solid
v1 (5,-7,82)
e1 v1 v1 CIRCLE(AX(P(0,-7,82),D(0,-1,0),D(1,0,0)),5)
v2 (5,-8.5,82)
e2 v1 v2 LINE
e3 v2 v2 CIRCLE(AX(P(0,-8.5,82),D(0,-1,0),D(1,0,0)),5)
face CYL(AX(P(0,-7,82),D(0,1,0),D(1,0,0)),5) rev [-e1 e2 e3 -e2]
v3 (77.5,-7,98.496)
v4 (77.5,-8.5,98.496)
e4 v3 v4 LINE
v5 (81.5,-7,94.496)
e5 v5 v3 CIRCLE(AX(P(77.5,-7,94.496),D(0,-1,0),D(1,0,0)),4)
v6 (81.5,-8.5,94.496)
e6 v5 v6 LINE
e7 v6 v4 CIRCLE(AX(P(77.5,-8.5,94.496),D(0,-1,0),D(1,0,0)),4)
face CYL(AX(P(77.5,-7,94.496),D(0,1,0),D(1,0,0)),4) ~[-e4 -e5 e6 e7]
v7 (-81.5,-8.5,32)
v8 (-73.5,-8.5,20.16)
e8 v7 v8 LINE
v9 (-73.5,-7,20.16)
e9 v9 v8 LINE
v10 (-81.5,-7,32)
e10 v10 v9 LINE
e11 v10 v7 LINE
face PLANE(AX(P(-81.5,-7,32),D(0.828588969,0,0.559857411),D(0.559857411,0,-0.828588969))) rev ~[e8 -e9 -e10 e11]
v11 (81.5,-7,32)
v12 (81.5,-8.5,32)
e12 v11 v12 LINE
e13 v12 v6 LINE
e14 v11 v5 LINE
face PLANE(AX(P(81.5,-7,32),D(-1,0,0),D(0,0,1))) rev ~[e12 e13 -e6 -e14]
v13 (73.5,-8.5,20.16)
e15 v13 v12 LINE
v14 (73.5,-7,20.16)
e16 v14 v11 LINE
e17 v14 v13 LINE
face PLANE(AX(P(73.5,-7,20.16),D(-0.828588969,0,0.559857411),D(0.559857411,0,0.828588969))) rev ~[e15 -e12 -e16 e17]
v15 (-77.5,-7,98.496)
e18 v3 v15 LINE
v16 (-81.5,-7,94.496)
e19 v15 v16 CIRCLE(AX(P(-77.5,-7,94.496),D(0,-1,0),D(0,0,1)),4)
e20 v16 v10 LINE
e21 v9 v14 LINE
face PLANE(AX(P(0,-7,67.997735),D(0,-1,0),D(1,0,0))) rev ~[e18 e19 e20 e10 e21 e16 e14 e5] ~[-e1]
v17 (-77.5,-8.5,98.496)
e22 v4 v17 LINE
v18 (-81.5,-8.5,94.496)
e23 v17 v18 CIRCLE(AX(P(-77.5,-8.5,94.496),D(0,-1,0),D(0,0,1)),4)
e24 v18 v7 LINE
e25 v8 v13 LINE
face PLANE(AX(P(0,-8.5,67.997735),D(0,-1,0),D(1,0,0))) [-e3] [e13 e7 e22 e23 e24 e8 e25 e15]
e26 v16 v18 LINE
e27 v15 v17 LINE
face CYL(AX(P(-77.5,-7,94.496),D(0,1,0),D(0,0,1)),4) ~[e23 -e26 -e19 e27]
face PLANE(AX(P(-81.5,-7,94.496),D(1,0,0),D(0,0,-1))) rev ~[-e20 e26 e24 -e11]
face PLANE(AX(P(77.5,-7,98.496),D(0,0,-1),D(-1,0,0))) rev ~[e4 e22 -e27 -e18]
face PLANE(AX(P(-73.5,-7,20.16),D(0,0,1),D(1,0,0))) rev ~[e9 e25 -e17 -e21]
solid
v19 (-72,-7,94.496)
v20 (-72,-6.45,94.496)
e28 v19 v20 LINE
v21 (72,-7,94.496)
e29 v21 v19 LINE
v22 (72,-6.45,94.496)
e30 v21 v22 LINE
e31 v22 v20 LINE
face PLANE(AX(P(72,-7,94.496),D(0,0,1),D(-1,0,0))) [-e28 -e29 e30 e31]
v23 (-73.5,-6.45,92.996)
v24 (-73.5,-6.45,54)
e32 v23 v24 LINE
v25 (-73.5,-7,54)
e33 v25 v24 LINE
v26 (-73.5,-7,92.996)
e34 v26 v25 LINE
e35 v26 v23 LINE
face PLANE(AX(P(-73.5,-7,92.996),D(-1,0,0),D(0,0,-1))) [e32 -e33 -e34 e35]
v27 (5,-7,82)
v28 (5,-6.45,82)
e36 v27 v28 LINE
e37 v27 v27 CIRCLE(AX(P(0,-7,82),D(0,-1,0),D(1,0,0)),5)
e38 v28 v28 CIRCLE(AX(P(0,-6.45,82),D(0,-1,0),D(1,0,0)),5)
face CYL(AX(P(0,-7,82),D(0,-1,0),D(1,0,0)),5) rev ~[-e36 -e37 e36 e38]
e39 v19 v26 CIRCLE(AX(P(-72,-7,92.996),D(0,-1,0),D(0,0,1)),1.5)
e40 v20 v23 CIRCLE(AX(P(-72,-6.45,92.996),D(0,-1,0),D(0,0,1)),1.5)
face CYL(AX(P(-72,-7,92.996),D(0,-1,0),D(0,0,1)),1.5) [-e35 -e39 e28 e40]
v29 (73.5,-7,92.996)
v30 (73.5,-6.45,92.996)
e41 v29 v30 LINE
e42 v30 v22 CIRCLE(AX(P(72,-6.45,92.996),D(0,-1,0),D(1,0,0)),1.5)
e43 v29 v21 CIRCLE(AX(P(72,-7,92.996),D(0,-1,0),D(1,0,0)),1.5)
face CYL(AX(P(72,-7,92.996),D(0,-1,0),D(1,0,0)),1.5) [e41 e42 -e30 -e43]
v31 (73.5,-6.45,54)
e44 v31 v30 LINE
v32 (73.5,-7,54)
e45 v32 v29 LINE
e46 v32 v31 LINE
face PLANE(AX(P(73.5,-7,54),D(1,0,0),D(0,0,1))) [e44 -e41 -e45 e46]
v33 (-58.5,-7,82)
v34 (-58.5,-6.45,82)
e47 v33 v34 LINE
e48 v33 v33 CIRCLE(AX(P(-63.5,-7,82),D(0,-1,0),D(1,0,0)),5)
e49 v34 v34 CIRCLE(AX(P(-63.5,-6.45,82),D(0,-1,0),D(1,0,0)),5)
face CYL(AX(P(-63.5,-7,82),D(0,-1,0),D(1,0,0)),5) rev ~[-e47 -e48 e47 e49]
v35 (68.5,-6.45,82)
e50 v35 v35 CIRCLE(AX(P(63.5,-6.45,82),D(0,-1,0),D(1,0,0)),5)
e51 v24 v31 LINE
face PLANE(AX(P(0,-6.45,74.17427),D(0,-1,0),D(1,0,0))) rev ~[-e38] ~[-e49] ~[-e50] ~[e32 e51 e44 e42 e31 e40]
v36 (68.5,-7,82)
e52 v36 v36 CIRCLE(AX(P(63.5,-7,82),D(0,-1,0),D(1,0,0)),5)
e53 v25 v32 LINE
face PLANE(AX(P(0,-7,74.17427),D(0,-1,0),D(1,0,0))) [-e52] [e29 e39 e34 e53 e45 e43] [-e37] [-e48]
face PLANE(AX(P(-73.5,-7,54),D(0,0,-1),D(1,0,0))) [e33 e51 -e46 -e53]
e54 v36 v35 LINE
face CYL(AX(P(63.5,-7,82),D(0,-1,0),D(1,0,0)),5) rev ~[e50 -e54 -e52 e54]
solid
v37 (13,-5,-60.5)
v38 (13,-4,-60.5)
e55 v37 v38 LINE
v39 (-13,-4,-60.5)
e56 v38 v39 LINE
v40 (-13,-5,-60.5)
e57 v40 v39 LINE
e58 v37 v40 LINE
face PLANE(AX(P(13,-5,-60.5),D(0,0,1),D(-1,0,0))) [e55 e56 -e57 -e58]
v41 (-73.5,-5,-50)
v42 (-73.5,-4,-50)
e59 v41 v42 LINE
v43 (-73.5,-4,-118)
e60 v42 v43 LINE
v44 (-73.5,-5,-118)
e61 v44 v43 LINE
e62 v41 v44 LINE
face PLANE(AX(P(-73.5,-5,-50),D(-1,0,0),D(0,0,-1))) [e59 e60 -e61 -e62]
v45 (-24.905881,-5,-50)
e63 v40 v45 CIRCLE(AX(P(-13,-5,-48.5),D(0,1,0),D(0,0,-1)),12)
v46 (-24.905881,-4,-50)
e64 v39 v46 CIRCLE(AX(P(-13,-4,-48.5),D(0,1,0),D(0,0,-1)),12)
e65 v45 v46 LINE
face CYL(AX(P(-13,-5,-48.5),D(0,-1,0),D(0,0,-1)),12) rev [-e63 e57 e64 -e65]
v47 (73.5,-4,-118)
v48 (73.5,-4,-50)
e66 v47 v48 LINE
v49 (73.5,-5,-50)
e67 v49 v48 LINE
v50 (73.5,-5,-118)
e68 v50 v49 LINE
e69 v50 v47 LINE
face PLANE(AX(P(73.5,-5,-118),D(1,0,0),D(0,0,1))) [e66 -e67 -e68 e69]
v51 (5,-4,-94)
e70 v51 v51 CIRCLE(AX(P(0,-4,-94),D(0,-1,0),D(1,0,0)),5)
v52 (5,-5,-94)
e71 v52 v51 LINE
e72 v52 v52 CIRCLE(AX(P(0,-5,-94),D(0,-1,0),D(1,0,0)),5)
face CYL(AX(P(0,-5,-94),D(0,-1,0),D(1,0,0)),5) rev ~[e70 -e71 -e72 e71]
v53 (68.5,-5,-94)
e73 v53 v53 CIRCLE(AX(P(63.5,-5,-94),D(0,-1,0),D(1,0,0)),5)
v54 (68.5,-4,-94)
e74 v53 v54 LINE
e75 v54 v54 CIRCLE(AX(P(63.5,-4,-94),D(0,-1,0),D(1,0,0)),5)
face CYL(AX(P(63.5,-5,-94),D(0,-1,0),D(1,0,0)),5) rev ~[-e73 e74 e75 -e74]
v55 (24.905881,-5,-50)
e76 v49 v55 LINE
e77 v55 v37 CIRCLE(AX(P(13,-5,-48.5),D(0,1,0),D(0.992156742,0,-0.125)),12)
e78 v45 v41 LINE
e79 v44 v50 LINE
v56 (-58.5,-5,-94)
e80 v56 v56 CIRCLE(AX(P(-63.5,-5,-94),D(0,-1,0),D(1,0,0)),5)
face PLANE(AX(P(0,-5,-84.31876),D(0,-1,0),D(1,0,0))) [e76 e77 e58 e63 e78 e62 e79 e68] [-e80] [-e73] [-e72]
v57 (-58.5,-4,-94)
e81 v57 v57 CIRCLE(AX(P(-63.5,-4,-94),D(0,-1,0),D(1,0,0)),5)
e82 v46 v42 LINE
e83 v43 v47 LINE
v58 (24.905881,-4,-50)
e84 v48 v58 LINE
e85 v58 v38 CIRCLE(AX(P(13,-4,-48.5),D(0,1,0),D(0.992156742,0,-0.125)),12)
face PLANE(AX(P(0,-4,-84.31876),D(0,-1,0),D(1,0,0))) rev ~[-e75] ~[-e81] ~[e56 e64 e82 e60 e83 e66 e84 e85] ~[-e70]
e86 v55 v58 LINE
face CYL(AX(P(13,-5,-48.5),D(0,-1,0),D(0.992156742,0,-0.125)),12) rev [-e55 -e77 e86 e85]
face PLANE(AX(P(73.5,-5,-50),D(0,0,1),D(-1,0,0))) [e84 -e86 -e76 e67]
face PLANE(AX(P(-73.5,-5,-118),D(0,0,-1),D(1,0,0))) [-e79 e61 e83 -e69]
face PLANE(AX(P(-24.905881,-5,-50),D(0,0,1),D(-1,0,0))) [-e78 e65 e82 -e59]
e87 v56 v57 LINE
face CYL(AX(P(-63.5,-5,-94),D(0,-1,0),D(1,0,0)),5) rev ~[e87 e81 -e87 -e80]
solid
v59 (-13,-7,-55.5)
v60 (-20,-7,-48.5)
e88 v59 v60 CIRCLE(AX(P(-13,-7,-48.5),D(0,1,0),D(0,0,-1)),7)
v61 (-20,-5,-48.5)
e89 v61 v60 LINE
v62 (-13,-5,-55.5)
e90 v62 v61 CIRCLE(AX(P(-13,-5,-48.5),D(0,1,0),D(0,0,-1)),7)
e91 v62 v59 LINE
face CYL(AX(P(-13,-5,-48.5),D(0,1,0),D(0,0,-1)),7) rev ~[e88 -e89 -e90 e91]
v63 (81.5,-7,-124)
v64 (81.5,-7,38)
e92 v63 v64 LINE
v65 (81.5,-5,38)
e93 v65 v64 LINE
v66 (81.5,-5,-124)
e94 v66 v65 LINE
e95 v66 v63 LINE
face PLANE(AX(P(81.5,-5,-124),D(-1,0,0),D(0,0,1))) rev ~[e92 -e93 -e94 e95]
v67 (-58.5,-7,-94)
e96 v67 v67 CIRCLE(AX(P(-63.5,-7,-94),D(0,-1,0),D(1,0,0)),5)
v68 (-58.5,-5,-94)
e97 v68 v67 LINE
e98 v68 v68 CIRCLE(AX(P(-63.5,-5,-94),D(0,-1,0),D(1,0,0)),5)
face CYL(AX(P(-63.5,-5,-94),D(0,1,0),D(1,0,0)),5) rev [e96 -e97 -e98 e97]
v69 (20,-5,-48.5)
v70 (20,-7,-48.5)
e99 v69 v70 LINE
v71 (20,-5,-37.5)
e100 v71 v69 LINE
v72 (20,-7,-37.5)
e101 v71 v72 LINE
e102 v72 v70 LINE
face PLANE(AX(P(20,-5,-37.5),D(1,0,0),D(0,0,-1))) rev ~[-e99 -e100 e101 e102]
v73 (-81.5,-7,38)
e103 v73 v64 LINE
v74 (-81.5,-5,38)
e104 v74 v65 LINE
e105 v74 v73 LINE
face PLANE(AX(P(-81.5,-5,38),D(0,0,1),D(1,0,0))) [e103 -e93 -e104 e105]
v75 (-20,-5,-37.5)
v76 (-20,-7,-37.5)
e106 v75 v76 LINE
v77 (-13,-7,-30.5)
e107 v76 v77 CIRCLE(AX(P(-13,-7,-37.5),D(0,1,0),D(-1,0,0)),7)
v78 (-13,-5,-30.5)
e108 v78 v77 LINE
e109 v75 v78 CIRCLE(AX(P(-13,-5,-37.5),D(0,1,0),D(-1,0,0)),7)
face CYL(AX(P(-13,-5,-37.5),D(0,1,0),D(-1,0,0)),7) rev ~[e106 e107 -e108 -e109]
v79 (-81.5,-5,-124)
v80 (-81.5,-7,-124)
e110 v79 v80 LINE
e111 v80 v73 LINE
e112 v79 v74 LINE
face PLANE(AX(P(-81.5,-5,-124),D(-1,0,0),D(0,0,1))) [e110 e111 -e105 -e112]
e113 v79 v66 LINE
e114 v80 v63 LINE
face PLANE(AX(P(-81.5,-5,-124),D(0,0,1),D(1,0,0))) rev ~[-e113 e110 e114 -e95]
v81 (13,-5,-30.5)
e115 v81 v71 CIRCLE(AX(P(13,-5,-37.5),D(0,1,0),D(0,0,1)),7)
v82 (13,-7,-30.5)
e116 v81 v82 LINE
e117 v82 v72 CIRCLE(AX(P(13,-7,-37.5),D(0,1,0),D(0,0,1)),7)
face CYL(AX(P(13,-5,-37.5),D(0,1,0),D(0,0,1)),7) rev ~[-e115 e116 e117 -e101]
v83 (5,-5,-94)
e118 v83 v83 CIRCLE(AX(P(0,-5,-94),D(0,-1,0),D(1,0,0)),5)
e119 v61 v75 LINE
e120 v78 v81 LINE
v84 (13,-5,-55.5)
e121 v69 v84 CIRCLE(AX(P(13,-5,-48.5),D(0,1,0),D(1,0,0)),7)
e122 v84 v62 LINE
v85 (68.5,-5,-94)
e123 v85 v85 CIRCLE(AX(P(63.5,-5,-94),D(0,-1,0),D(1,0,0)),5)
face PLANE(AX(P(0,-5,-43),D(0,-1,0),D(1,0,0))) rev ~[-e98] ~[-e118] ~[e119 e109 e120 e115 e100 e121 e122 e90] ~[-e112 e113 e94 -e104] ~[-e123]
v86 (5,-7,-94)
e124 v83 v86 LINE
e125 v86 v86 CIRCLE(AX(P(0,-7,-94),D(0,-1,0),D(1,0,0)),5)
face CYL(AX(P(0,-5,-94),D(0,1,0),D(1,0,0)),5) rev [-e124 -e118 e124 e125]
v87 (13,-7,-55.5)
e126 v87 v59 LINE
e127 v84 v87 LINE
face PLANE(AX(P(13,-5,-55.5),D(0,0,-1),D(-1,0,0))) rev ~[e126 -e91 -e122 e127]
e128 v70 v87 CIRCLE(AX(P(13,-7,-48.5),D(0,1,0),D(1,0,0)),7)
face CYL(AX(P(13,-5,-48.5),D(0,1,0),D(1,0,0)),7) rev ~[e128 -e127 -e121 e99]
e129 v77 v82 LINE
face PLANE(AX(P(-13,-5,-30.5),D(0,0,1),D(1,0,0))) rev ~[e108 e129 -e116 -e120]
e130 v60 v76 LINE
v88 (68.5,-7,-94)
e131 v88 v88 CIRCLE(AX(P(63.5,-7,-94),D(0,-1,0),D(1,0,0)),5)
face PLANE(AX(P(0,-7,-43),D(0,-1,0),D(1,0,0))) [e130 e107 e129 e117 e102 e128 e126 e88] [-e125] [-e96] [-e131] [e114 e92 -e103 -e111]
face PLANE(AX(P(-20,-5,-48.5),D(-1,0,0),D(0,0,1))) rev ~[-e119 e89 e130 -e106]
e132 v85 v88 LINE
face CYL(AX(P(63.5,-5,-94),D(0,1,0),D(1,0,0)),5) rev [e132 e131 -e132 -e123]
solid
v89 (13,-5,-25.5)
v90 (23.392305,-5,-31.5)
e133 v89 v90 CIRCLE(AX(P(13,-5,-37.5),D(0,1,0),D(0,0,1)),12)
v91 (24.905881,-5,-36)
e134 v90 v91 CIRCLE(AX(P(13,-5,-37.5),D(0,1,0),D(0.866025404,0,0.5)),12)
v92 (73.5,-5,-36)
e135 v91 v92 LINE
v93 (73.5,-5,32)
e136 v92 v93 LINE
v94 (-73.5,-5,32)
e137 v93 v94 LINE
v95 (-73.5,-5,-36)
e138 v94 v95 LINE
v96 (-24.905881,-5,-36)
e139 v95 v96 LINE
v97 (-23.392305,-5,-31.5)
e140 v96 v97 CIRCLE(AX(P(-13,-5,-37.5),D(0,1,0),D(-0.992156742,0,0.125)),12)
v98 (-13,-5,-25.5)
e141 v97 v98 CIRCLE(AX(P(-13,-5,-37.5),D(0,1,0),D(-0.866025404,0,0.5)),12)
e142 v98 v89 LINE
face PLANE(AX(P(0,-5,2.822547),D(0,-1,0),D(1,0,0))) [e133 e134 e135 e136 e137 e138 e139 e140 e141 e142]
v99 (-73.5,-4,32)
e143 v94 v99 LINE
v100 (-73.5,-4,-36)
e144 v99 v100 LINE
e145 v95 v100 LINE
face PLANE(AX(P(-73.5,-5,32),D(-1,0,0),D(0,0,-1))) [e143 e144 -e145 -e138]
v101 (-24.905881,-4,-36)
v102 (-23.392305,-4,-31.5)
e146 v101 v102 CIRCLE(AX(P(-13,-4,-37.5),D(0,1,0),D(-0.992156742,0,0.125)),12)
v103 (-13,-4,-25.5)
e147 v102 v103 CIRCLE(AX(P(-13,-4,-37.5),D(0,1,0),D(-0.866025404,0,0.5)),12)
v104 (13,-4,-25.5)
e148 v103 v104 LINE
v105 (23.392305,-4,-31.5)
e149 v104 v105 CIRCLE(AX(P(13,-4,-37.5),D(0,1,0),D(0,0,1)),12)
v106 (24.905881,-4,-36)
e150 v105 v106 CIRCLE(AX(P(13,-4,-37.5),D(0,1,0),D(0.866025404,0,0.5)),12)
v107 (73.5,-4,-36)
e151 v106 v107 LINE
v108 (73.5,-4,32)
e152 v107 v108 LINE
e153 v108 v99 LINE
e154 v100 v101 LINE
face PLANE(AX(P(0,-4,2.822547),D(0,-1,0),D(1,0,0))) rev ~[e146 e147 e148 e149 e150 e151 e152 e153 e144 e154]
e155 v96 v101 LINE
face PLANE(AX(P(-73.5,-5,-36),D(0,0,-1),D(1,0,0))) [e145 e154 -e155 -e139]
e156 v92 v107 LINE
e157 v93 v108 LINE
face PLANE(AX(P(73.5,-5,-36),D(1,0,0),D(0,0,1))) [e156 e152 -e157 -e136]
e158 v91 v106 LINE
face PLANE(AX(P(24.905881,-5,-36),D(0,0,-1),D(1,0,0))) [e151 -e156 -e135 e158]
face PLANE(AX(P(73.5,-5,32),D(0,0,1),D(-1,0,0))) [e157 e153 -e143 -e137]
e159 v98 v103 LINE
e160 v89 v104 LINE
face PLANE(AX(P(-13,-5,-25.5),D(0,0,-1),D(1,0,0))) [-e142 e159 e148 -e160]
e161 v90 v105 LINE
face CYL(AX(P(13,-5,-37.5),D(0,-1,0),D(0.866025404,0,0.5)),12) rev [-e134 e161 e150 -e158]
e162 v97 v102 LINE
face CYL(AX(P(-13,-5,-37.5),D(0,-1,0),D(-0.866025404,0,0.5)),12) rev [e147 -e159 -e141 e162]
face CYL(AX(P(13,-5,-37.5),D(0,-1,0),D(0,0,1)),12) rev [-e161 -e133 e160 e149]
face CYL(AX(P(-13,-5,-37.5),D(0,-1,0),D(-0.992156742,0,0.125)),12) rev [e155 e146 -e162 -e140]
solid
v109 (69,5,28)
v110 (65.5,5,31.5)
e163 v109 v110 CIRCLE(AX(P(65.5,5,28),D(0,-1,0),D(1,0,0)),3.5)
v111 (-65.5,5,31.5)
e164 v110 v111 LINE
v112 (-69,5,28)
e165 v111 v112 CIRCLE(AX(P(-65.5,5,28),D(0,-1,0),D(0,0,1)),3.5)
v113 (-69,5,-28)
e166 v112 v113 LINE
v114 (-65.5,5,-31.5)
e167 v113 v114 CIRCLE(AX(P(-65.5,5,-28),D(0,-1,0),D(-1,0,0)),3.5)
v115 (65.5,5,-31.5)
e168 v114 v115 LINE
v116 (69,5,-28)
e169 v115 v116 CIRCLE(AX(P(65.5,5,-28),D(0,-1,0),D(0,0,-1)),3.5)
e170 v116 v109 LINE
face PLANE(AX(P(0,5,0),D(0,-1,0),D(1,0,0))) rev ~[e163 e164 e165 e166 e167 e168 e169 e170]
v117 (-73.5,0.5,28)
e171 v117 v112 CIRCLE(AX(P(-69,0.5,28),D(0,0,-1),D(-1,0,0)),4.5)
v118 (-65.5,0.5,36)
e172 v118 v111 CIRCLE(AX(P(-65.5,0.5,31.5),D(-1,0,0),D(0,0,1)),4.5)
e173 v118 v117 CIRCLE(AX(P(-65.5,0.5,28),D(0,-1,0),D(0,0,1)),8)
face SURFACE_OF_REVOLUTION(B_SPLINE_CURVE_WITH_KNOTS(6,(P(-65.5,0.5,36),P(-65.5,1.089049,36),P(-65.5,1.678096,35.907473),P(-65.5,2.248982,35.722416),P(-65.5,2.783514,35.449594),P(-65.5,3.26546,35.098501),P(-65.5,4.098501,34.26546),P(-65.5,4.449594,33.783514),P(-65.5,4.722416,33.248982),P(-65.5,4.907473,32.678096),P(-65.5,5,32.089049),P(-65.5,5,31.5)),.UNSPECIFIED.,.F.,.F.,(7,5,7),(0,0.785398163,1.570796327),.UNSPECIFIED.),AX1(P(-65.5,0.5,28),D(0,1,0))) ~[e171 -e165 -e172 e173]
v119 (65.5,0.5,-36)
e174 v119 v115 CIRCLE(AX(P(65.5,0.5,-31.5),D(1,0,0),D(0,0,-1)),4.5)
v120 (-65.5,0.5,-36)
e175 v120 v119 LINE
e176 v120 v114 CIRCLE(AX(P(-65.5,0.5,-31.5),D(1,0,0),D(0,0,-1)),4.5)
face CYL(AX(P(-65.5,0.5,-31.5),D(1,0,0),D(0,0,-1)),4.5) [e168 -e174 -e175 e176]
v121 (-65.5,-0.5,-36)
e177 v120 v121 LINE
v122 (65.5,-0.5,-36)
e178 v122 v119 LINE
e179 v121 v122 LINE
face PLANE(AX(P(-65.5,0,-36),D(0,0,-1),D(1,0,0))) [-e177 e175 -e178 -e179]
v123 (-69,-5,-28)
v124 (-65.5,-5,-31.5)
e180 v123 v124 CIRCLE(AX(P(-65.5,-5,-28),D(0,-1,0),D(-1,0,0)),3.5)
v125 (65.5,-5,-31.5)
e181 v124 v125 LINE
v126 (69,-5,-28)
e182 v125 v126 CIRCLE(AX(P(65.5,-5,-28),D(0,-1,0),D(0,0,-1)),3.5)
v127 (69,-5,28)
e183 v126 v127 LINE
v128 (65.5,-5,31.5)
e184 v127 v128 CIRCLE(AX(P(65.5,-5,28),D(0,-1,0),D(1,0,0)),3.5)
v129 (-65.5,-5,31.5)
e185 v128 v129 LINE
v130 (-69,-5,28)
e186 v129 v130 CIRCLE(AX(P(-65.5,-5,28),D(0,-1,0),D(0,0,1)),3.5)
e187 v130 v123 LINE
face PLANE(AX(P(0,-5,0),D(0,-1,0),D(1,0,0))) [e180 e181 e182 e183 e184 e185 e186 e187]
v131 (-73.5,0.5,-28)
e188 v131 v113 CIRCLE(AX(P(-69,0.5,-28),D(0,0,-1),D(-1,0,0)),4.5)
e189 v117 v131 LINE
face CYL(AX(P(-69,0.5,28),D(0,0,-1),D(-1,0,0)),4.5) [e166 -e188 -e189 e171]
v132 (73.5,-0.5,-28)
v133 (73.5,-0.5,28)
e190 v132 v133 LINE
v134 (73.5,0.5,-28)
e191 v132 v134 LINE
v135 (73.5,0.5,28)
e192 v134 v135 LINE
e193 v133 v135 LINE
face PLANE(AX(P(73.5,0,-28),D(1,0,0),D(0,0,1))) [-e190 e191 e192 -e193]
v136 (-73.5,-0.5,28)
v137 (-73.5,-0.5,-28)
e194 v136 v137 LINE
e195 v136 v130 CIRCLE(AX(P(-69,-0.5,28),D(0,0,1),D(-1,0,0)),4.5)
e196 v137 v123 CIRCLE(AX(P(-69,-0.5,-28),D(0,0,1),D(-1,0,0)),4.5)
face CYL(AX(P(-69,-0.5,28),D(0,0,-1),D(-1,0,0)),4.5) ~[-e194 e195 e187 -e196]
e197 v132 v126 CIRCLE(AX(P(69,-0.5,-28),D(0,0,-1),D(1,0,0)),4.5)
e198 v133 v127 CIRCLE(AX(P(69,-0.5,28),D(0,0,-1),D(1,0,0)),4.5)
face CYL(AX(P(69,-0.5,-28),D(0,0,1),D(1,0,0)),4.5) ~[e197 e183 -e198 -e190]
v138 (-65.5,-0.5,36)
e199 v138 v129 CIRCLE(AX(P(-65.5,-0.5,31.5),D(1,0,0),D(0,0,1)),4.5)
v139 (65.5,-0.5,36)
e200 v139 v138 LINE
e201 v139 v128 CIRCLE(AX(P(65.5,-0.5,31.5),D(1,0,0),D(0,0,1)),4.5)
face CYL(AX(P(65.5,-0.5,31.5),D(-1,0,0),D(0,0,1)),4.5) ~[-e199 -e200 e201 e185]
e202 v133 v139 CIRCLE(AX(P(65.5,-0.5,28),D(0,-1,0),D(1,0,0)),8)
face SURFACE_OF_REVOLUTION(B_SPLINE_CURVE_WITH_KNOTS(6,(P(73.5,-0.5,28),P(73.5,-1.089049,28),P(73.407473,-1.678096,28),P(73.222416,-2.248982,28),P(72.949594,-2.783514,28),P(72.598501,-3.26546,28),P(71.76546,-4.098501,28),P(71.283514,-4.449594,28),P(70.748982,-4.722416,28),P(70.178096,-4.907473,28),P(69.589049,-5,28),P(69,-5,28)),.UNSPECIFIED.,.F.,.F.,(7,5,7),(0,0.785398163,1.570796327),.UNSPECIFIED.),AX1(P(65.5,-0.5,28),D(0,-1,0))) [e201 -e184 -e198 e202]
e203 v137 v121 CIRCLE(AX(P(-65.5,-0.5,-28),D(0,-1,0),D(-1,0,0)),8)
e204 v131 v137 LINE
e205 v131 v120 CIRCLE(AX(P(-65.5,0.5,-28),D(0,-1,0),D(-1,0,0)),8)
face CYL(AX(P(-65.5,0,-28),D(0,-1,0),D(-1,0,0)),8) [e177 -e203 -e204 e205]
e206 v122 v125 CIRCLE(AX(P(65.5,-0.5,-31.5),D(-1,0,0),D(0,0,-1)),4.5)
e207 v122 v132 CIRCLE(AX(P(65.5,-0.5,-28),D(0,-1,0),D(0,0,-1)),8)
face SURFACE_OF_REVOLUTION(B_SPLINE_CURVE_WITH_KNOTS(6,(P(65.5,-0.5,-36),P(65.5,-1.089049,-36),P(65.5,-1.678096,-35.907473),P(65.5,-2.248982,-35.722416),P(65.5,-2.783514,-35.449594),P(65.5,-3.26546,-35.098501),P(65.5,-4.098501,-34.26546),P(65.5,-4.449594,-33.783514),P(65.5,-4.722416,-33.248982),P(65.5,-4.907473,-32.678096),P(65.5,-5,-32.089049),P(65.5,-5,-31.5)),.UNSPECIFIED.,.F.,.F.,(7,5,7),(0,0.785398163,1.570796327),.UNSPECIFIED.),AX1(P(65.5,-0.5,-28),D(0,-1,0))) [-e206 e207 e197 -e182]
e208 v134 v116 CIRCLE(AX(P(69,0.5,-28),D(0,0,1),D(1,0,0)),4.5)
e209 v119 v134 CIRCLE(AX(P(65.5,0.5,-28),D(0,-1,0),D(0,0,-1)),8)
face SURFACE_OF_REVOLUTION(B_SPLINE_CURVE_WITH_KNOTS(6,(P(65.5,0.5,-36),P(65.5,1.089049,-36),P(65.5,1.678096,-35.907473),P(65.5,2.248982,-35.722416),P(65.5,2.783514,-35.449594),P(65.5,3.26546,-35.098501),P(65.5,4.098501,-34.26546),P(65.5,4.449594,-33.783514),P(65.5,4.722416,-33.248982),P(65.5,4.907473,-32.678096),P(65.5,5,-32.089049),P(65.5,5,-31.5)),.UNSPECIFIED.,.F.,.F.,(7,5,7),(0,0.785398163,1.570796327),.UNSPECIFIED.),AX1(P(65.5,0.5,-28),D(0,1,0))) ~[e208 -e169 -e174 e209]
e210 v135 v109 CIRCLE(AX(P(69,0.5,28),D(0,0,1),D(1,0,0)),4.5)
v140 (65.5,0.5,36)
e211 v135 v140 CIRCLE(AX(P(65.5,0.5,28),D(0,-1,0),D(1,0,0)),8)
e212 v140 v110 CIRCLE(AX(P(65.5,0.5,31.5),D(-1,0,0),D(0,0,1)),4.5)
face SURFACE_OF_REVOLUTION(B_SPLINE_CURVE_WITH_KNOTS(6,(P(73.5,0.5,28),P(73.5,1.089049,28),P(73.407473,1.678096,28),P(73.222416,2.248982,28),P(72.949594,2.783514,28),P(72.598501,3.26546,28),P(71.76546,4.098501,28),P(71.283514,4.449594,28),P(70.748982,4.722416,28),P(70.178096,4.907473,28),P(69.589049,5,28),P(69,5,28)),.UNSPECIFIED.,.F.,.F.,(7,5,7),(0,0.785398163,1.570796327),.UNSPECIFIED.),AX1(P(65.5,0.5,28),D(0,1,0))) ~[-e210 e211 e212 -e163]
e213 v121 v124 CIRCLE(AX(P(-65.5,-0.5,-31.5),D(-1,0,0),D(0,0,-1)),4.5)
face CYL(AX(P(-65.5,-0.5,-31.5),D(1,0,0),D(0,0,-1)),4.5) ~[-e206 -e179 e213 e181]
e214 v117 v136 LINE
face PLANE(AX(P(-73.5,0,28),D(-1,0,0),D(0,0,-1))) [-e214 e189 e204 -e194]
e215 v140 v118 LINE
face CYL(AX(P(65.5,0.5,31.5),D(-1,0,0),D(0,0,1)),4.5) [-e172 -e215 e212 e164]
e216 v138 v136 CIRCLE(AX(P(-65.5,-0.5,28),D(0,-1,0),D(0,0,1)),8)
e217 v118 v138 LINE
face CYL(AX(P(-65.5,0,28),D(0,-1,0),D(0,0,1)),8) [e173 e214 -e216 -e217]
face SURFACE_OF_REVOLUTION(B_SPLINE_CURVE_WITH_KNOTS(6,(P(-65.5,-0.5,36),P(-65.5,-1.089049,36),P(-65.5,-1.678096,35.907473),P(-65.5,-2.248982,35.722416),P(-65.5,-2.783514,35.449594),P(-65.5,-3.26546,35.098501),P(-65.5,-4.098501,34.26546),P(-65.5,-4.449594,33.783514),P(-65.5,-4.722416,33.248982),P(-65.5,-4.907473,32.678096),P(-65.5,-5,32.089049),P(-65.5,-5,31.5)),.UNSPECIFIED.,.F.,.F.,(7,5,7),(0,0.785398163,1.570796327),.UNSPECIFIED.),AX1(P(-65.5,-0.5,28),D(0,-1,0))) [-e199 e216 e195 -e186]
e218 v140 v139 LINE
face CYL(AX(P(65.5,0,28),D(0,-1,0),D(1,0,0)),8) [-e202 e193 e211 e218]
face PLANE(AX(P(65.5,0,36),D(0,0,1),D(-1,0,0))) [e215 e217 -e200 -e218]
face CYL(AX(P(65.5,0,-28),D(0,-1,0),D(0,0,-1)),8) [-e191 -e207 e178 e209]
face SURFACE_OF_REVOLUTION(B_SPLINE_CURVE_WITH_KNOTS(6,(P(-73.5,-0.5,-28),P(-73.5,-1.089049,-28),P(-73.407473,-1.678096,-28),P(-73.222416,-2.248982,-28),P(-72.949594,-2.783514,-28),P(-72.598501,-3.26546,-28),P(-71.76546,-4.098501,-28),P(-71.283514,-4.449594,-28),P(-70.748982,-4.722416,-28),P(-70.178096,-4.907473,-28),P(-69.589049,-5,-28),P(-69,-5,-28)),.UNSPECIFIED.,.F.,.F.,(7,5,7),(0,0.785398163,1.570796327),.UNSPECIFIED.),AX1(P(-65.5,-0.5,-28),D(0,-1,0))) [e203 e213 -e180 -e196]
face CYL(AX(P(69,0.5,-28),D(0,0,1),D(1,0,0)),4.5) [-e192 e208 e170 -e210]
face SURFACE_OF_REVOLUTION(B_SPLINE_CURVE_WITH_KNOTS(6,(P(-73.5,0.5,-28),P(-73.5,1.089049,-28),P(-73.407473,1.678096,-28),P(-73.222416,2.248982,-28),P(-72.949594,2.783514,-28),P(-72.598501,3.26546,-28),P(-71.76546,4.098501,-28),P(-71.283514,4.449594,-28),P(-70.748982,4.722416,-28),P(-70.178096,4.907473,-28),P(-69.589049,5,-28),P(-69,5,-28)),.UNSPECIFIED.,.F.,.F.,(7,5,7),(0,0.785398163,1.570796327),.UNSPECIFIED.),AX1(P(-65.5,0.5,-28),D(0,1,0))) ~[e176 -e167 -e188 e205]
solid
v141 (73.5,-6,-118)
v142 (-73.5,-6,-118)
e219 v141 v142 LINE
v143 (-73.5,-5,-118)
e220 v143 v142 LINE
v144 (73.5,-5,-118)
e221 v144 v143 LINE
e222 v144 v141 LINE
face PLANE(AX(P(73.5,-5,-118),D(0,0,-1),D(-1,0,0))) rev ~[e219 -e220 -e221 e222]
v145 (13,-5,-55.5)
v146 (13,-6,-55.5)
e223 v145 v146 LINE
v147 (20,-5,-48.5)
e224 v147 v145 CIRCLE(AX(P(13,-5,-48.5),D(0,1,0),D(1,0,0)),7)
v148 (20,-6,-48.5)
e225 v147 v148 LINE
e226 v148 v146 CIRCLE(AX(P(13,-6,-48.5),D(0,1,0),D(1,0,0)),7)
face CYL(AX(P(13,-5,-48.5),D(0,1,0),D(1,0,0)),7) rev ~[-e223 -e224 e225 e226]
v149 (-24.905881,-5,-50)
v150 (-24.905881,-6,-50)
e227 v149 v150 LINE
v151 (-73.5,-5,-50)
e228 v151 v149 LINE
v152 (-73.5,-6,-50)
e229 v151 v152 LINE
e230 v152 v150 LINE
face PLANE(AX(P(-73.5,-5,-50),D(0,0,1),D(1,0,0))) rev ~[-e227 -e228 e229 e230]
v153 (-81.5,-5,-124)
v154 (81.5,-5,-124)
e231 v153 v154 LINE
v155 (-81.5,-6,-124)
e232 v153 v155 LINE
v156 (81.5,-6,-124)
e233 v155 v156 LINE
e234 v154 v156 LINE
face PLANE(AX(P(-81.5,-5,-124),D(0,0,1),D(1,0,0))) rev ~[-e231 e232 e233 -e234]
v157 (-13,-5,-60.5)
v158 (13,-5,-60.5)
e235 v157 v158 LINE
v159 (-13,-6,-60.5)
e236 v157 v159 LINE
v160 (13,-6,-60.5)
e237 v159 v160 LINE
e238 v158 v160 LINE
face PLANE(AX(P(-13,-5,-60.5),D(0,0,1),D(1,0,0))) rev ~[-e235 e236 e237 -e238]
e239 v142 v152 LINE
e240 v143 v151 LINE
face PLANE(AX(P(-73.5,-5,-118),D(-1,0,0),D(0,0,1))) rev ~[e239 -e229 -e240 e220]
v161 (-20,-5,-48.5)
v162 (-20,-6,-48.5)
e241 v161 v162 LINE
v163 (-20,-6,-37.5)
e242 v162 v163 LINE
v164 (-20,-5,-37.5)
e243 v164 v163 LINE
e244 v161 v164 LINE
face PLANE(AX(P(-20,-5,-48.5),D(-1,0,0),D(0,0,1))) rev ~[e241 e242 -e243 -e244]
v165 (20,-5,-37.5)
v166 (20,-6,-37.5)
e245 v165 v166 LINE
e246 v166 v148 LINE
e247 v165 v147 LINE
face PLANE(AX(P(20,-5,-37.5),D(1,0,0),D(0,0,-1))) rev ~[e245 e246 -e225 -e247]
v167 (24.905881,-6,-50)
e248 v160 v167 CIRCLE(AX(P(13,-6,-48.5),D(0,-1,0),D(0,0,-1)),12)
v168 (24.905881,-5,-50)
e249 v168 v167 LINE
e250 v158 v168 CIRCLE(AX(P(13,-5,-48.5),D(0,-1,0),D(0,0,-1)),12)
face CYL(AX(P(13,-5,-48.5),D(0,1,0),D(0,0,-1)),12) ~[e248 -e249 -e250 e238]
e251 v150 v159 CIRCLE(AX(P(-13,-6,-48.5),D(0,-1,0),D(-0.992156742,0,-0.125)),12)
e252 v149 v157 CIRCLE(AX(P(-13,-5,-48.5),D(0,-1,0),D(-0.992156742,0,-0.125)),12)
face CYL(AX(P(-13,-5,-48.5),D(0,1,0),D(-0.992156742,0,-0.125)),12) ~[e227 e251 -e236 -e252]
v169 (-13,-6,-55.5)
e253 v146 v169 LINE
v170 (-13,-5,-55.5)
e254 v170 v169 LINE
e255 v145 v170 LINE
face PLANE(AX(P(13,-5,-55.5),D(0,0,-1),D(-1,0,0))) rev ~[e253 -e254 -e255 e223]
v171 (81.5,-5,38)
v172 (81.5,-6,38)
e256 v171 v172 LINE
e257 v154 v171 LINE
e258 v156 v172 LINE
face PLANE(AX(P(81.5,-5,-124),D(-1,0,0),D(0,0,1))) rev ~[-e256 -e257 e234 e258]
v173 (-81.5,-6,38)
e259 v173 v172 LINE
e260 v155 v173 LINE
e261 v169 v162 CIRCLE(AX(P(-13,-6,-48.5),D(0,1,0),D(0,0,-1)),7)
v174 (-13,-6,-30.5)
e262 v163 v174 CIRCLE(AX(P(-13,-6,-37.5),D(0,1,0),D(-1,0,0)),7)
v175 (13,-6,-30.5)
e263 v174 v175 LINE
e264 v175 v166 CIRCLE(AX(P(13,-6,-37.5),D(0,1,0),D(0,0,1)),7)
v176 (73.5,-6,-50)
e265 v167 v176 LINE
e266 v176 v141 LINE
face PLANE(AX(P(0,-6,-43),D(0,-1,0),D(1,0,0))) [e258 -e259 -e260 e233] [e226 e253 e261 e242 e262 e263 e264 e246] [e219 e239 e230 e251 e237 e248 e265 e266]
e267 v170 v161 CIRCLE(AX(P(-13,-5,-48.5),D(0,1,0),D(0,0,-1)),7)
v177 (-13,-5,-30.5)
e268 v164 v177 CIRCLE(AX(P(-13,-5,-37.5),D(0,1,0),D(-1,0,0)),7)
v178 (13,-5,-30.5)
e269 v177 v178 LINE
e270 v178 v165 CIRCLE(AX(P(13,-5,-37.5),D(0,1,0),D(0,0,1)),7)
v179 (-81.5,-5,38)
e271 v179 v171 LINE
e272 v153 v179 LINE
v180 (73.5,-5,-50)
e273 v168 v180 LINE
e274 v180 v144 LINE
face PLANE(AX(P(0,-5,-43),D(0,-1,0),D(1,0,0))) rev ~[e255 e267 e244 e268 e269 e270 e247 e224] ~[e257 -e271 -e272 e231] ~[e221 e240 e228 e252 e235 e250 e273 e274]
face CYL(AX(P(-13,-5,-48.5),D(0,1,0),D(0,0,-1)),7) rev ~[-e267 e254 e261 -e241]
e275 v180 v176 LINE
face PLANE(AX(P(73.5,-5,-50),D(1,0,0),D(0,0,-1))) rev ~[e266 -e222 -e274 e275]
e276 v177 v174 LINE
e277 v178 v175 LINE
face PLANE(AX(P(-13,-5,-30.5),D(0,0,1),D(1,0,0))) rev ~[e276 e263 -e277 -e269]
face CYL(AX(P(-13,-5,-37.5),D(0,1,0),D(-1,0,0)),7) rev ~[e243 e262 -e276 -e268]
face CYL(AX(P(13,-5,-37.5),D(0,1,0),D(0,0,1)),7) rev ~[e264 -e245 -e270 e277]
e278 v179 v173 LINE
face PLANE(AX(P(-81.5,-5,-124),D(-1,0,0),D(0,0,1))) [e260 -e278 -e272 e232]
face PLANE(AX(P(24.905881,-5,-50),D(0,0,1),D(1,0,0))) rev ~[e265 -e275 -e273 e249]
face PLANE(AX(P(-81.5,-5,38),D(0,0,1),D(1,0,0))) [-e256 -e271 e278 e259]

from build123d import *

# Parameters (mm, degrees)
F1_DEPTH = 5
F2_R     = 4.5
F3_W     = 163
F3_H     = 162
F3_R     = 5
F4_DEPTH = 2
F5_DEPTH = 1
F6_R     = 5
F7_DEPTH = 1.5
F8_DEPTH = 0.55
F9_DEPTH = 1


# Not quite as in the source:
# - a feature names something its author has since deleted; it is built from what else it names


with BuildPart() as f1:
    # F0 (on Front) → F1 (new body, symmetric)
    with BuildSketch(Plane.XZ):
        with BuildLine():
            ThreePointArc((73.5, 28), (71.1568542495, 33.6568542495), (65.5, 36))
            Line((65.5, 36), (-65.5, 36))
            ThreePointArc((-65.5, 36), (-71.1568542495, 33.6568542495), (-73.5, 28))
            Line((-73.5, 28), (-73.5, -28))
            ThreePointArc((-73.5, -28), (-71.1568542495, -33.6568542495), (-65.5, -36))
            Line((-65.5, -36), (65.5, -36))
            ThreePointArc((65.5, -36), (71.1568542495, -33.6568542495), (73.5, -28))
            Line((73.5, -28), (73.5, 28))
        make_face()
    extrude(amount=F1_DEPTH, both=True)

    # F2
    f2_edges = [f1.edges().sort_by_distance(p)[0] for p in [
        (71.156854, -5, 33.656854),
        (0, -5, 36),
        (-71.156854, -5, 33.656854),
        (-73.5, -5, 0),
        (-71.156854, -5, -33.656854),
        (0, -5, -36),
        (71.156854, -5, -33.656854),
        (73.5, -5, 0),
        (71.156854, 5, 33.656854),
        (0, 5, 36),
        (-71.156854, 5, 33.656854),
        (-73.5, 5, 0),
        (-71.156854, 5, -33.656854),
        (0, 5, -36),
        (71.156854, 5, -33.656854),
        (73.5, 5, 0),
    ]]
    fillet(f2_edges, radius=F2_R)


with BuildPart() as f4:
    # F3 (on face) → F4 (new body)
    with BuildSketch(Plane.XZ.offset(5)):
        with Locations((0, -43)):
            Rectangle(F3_W, F3_H)
        with BuildLine():
            Line((-73.5, -50), (-24.9058808998, -50))
            ThreePointArc((-24.9058808998, -50), (-20.9372539332, -57.5), (-13, -60.5))
            Line((-13, -60.5), (13, -60.5))
            ThreePointArc((13, -60.5), (20.9372539332, -57.5), (24.9058808998, -50))
            Line((24.9058808998, -50), (73.5, -50))
            Line((73.5, -50), (73.5, -118))
            Line((73.5, -118), (-73.5, -118))
            Line((-73.5, -118), (-73.5, -50))
        make_face(mode=Mode.SUBTRACT)
        with BuildLine():
            ThreePointArc((-20, -37.5), (-17.9497474683, -32.5502525317), (-13, -30.5))
            Line((-13, -30.5), (13, -30.5))
            ThreePointArc((13, -30.5), (17.9497474683, -32.5502525317), (20, -37.5))
            Line((20, -37.5), (20, -48.5))
            ThreePointArc((20, -48.5), (17.9497474683, -53.4497474683), (13, -55.5))
            Line((13, -55.5), (-13, -55.5))
            ThreePointArc((-13, -55.5), (-17.9497474683, -53.4497474683), (-20, -48.5))
            Line((-20, -48.5), (-20, -37.5))
        make_face(mode=Mode.SUBTRACT)
        with BuildLine():
            Line((73.5, 32), (73.5, -36))
            Line((73.5, -36), (24.9058808998, -36))
            ThreePointArc((24.9058808998, -36), (20.9372539332, -28.5), (13, -25.5))
            Line((13, -25.5), (-13, -25.5))
            ThreePointArc((-13, -25.5), (-20.9372539332, -28.5), (-24.9058808998, -36))
            Line((-24.9058808998, -36), (-73.5, -36))
            Line((-73.5, -36), (-73.5, 32))
            Line((-73.5, 32), (73.5, 32))
        make_face(mode=Mode.SUBTRACT)
        with BuildLine():
            ThreePointArc((13, -25.5), (19, -27.1076951546), (23.3923048454, -31.5))
            Line((23.3923048454, -31.5), (65.5, -31.5))
            ThreePointArc((65.5, -31.5), (67.9748737342, -30.4748737342), (69, -28))
            Line((69, -28), (69, 28))
            ThreePointArc((69, 28), (67.9748737342, 30.4748737342), (65.5, 31.5))
            Line((65.5, 31.5), (-65.5, 31.5))
            ThreePointArc((-65.5, 31.5), (-67.9748737342, 30.4748737342), (-69, 28))
            Line((-69, 28), (-69, -28))
            ThreePointArc((-69, -28), (-67.9748737342, -30.4748737342), (-65.5, -31.5))
            Line((-65.5, -31.5), (-23.3923048454, -31.5))
            ThreePointArc((-23.3923048454, -31.5), (-19, -27.1076951546), (-13, -25.5))
            Line((-13, -25.5), (13, -25.5))
        make_face()
        with BuildLine():
            ThreePointArc((-13, -60.5), (-20.9372539332, -57.5), (-24.9058808998, -50))
            Line((-24.9058808998, -50), (-73.5, -50))
            Line((-73.5, -50), (-73.5, -118))
            Line((-73.5, -118), (73.5, -118))
            Line((73.5, -118), (73.5, -50))
            Line((73.5, -50), (24.9058808998, -50))
            ThreePointArc((24.9058808998, -50), (20.9372539332, -57.5), (13, -60.5))
            Line((13, -60.5), (-13, -60.5))
        make_face()
        with Locations((-63.5, -94)):
            Circle(F3_R, mode=Mode.SUBTRACT)
        with Locations((0, -94)):
            Circle(F3_R, mode=Mode.SUBTRACT)
        with Locations((63.5, -94)):
            Circle(F3_R, mode=Mode.SUBTRACT)
        with BuildLine():
            Line((24.9058808998, -36), (73.5, -36))
            Line((73.5, -36), (73.5, 32))
            Line((73.5, 32), (-73.5, 32))
            Line((-73.5, 32), (-73.5, -36))
            Line((-73.5, -36), (-24.9058808998, -36))
            ThreePointArc((-24.9058808998, -36), (-24.3738635424, -33.6743983325), (-23.3923048454, -31.5))
            Line((-23.3923048454, -31.5), (-65.5, -31.5))
            ThreePointArc((-65.5, -31.5), (-67.9748737342, -30.4748737342), (-69, -28))
            Line((-69, -28), (-69, 28))
            ThreePointArc((-69, 28), (-67.9748737342, 30.4748737342), (-65.5, 31.5))
            Line((-65.5, 31.5), (65.5, 31.5))
            ThreePointArc((65.5, 31.5), (67.9748737342, 30.4748737342), (69, 28))
            Line((69, 28), (69, -28))
            ThreePointArc((69, -28), (67.9748737342, -30.4748737342), (65.5, -31.5))
            Line((65.5, -31.5), (23.3923048454, -31.5))
            ThreePointArc((23.3923048454, -31.5), (24.3738635424, -33.6743983325), (24.9058808998, -36))
        make_face()
    extrude(amount=F4_DEPTH)


with BuildPart() as f5:
    # F3 (on face) → F5 (new body)
    with BuildSketch(Plane.XZ.offset(5)):
        with BuildLine():
            Line((24.9058808998, -36), (73.5, -36))
            Line((73.5, -36), (73.5, 32))
            Line((73.5, 32), (-73.5, 32))
            Line((-73.5, 32), (-73.5, -36))
            Line((-73.5, -36), (-24.9058808998, -36))
            ThreePointArc((-24.9058808998, -36), (-24.3738635424, -33.6743983325), (-23.3923048454, -31.5))
            Line((-23.3923048454, -31.5), (-65.5, -31.5))
            ThreePointArc((-65.5, -31.5), (-67.9748737342, -30.4748737342), (-69, -28))
            Line((-69, -28), (-69, 28))
            ThreePointArc((-69, 28), (-67.9748737342, 30.4748737342), (-65.5, 31.5))
            Line((-65.5, 31.5), (65.5, 31.5))
            ThreePointArc((65.5, 31.5), (67.9748737342, 30.4748737342), (69, 28))
            Line((69, 28), (69, -28))
            ThreePointArc((69, -28), (67.9748737342, -30.4748737342), (65.5, -31.5))
            Line((65.5, -31.5), (23.3923048454, -31.5))
            ThreePointArc((23.3923048454, -31.5), (24.3738635424, -33.6743983325), (24.9058808998, -36))
        make_face()
        with BuildLine():
            ThreePointArc((13, -25.5), (19, -27.1076951546), (23.3923048454, -31.5))
            Line((23.3923048454, -31.5), (65.5, -31.5))
            ThreePointArc((65.5, -31.5), (67.9748737342, -30.4748737342), (69, -28))
            Line((69, -28), (69, 28))
            ThreePointArc((69, 28), (67.9748737342, 30.4748737342), (65.5, 31.5))
            Line((65.5, 31.5), (-65.5, 31.5))
            ThreePointArc((-65.5, 31.5), (-67.9748737342, 30.4748737342), (-69, 28))
            Line((-69, 28), (-69, -28))
            ThreePointArc((-69, -28), (-67.9748737342, -30.4748737342), (-65.5, -31.5))
            Line((-65.5, -31.5), (-23.3923048454, -31.5))
            ThreePointArc((-23.3923048454, -31.5), (-19, -27.1076951546), (-13, -25.5))
            Line((-13, -25.5), (13, -25.5))
        make_face()
    extrude(amount=-F5_DEPTH)


with BuildPart() as f5b:
    # F3 (on face) → F5, piece 2 (new body)
    with BuildSketch(Plane.XZ.offset(5)):
        with BuildLine():
            ThreePointArc((-13, -60.5), (-20.9372539332, -57.5), (-24.9058808998, -50))
            Line((-24.9058808998, -50), (-73.5, -50))
            Line((-73.5, -50), (-73.5, -118))
            Line((-73.5, -118), (73.5, -118))
            Line((73.5, -118), (73.5, -50))
            Line((73.5, -50), (24.9058808998, -50))
            ThreePointArc((24.9058808998, -50), (20.9372539332, -57.5), (13, -60.5))
            Line((13, -60.5), (-13, -60.5))
        make_face()
        with Locations((-63.5, -94)):
            Circle(F3_R, mode=Mode.SUBTRACT)
        with Locations((0, -94)):
            Circle(F3_R, mode=Mode.SUBTRACT)
        with Locations((63.5, -94)):
            Circle(F3_R, mode=Mode.SUBTRACT)
    extrude(amount=-F5_DEPTH)


with BuildPart() as f7:
    # F6 (on face) → F7 (new body)
    with BuildSketch(Plane.XZ.offset(7)):
        with BuildLine():
            ThreePointArc((-77.5, 98.496), (-80.3284271247, 97.3244271247), (-81.5, 94.496))
            Line((-81.5, 94.496), (-81.5, 38))
            Line((-81.5, 38), (81.5, 38))
            Line((81.5, 38), (81.5, 94.496))
            ThreePointArc((81.5, 94.496), (80.3284271247, 97.3244271247), (77.5, 98.496))
            Line((77.5, 98.496), (0, 98.496))
            Line((0, 98.496), (-77.5, 98.496))
        make_face()
        with BuildLine():
            Line((73.5, 54), (-73.5, 54))
            Line((-73.5, 54), (-73.5, 92.996))
            ThreePointArc((-73.5, 92.996), (-73.0606601718, 94.0566601718), (-72, 94.496))
            Line((-72, 94.496), (72, 94.496))
            ThreePointArc((72, 94.496), (73.0606601718, 94.0566601718), (73.5, 92.996))
            Line((73.5, 92.996), (73.5, 54))
        make_face(mode=Mode.SUBTRACT)
        Polygon((81.5, 38), (-81.5, 38), (-81.5, 32), (-73.5, 20.16), (0, 20.16), (73.5, 20.16), (81.5, 32), align=None)
        with BuildLine():
            Line((-73.5, 92.996), (-73.5, 54))
            Line((-73.5, 54), (73.5, 54))
            Line((73.5, 54), (73.5, 92.996))
            ThreePointArc((73.5, 92.996), (73.0606601718, 94.0566601718), (72, 94.496))
            Line((72, 94.496), (-72, 94.496))
            ThreePointArc((-72, 94.496), (-73.0606601718, 94.0566601718), (-73.5, 92.996))
        make_face()
        with Locations((-63.5, 82)):
            Circle(F6_R, mode=Mode.SUBTRACT)
        with Locations((0, 82)):
            Circle(F6_R, mode=Mode.SUBTRACT)
        with Locations((63.5, 82)):
            Circle(F6_R, mode=Mode.SUBTRACT)
        with Locations((63.5, 82)):
            Circle(F6_R)
        with Locations((-63.5, 82)):
            Circle(F6_R)
    extrude(amount=F7_DEPTH)


with BuildPart() as f8:
    # F6 (on face) → F8 (new body)
    with BuildSketch(Plane.XZ.offset(7)):
        with BuildLine():
            Line((-73.5, 92.996), (-73.5, 54))
            Line((-73.5, 54), (73.5, 54))
            Line((73.5, 54), (73.5, 92.996))
            ThreePointArc((73.5, 92.996), (73.0606601718, 94.0566601718), (72, 94.496))
            Line((72, 94.496), (-72, 94.496))
            ThreePointArc((-72, 94.496), (-73.0606601718, 94.0566601718), (-73.5, 92.996))
        make_face()
        with Locations((-63.5, 82)):
            Circle(F6_R, mode=Mode.SUBTRACT)
        with Locations((0, 82)):
            Circle(F6_R, mode=Mode.SUBTRACT)
        with Locations((63.5, 82)):
            Circle(F6_R, mode=Mode.SUBTRACT)
    extrude(amount=-F8_DEPTH)


with BuildPart() as f9:
    # F3 (on face) → F9 (new body)
    with BuildSketch(Plane.XZ.offset(5)):
        with Locations((0, -43)):
            Rectangle(F3_W, F3_H)
        with BuildLine():
            Line((-73.5, -50), (-24.9058808998, -50))
            ThreePointArc((-24.9058808998, -50), (-20.9372539332, -57.5), (-13, -60.5))
            Line((-13, -60.5), (13, -60.5))
            ThreePointArc((13, -60.5), (20.9372539332, -57.5), (24.9058808998, -50))
            Line((24.9058808998, -50), (73.5, -50))
            Line((73.5, -50), (73.5, -118))
            Line((73.5, -118), (-73.5, -118))
            Line((-73.5, -118), (-73.5, -50))
        make_face(mode=Mode.SUBTRACT)
        with BuildLine():
            ThreePointArc((-20, -37.5), (-17.9497474683, -32.5502525317), (-13, -30.5))
            Line((-13, -30.5), (13, -30.5))
            ThreePointArc((13, -30.5), (17.9497474683, -32.5502525317), (20, -37.5))
            Line((20, -37.5), (20, -48.5))
            ThreePointArc((20, -48.5), (17.9497474683, -53.4497474683), (13, -55.5))
            Line((13, -55.5), (-13, -55.5))
            ThreePointArc((-13, -55.5), (-17.9497474683, -53.4497474683), (-20, -48.5))
            Line((-20, -48.5), (-20, -37.5))
        make_face(mode=Mode.SUBTRACT)
        with BuildLine():
            Line((73.5, 32), (73.5, -36))
            Line((73.5, -36), (24.9058808998, -36))
            ThreePointArc((24.9058808998, -36), (20.9372539332, -28.5), (13, -25.5))
            Line((13, -25.5), (-13, -25.5))
            ThreePointArc((-13, -25.5), (-20.9372539332, -28.5), (-24.9058808998, -36))
            Line((-24.9058808998, -36), (-73.5, -36))
            Line((-73.5, -36), (-73.5, 32))
            Line((-73.5, 32), (73.5, 32))
        make_face(mode=Mode.SUBTRACT)
        with BuildLine():
            Line((24.9058808998, -36), (73.5, -36))
            Line((73.5, -36), (73.5, 32))
            Line((73.5, 32), (-73.5, 32))
            Line((-73.5, 32), (-73.5, -36))
            Line((-73.5, -36), (-24.9058808998, -36))
            ThreePointArc((-24.9058808998, -36), (-24.3738635424, -33.6743983325), (-23.3923048454, -31.5))
            Line((-23.3923048454, -31.5), (-65.5, -31.5))
            ThreePointArc((-65.5, -31.5), (-67.9748737342, -30.4748737342), (-69, -28))
            Line((-69, -28), (-69, 28))
            ThreePointArc((-69, 28), (-67.9748737342, 30.4748737342), (-65.5, 31.5))
            Line((-65.5, 31.5), (65.5, 31.5))
            ThreePointArc((65.5, 31.5), (67.9748737342, 30.4748737342), (69, 28))
            Line((69, 28), (69, -28))
            ThreePointArc((69, -28), (67.9748737342, -30.4748737342), (65.5, -31.5))
            Line((65.5, -31.5), (23.3923048454, -31.5))
            ThreePointArc((23.3923048454, -31.5), (24.3738635424, -33.6743983325), (24.9058808998, -36))
        make_face()
        with BuildLine():
            ThreePointArc((13, -25.5), (19, -27.1076951546), (23.3923048454, -31.5))
            Line((23.3923048454, -31.5), (65.5, -31.5))
            ThreePointArc((65.5, -31.5), (67.9748737342, -30.4748737342), (69, -28))
            Line((69, -28), (69, 28))
            ThreePointArc((69, 28), (67.9748737342, 30.4748737342), (65.5, 31.5))
            Line((65.5, 31.5), (-65.5, 31.5))
            ThreePointArc((-65.5, 31.5), (-67.9748737342, 30.4748737342), (-69, 28))
            Line((-69, 28), (-69, -28))
            ThreePointArc((-69, -28), (-67.9748737342, -30.4748737342), (-65.5, -31.5))
            Line((-65.5, -31.5), (-23.3923048454, -31.5))
            ThreePointArc((-23.3923048454, -31.5), (-19, -27.1076951546), (-13, -25.5))
            Line((-13, -25.5), (13, -25.5))
        make_face()
    extrude(amount=F9_DEPTH)


solid = Compound([f1.part, f4.part, f5.part, f5b.part, f7.part, f8.part, f9.part])
